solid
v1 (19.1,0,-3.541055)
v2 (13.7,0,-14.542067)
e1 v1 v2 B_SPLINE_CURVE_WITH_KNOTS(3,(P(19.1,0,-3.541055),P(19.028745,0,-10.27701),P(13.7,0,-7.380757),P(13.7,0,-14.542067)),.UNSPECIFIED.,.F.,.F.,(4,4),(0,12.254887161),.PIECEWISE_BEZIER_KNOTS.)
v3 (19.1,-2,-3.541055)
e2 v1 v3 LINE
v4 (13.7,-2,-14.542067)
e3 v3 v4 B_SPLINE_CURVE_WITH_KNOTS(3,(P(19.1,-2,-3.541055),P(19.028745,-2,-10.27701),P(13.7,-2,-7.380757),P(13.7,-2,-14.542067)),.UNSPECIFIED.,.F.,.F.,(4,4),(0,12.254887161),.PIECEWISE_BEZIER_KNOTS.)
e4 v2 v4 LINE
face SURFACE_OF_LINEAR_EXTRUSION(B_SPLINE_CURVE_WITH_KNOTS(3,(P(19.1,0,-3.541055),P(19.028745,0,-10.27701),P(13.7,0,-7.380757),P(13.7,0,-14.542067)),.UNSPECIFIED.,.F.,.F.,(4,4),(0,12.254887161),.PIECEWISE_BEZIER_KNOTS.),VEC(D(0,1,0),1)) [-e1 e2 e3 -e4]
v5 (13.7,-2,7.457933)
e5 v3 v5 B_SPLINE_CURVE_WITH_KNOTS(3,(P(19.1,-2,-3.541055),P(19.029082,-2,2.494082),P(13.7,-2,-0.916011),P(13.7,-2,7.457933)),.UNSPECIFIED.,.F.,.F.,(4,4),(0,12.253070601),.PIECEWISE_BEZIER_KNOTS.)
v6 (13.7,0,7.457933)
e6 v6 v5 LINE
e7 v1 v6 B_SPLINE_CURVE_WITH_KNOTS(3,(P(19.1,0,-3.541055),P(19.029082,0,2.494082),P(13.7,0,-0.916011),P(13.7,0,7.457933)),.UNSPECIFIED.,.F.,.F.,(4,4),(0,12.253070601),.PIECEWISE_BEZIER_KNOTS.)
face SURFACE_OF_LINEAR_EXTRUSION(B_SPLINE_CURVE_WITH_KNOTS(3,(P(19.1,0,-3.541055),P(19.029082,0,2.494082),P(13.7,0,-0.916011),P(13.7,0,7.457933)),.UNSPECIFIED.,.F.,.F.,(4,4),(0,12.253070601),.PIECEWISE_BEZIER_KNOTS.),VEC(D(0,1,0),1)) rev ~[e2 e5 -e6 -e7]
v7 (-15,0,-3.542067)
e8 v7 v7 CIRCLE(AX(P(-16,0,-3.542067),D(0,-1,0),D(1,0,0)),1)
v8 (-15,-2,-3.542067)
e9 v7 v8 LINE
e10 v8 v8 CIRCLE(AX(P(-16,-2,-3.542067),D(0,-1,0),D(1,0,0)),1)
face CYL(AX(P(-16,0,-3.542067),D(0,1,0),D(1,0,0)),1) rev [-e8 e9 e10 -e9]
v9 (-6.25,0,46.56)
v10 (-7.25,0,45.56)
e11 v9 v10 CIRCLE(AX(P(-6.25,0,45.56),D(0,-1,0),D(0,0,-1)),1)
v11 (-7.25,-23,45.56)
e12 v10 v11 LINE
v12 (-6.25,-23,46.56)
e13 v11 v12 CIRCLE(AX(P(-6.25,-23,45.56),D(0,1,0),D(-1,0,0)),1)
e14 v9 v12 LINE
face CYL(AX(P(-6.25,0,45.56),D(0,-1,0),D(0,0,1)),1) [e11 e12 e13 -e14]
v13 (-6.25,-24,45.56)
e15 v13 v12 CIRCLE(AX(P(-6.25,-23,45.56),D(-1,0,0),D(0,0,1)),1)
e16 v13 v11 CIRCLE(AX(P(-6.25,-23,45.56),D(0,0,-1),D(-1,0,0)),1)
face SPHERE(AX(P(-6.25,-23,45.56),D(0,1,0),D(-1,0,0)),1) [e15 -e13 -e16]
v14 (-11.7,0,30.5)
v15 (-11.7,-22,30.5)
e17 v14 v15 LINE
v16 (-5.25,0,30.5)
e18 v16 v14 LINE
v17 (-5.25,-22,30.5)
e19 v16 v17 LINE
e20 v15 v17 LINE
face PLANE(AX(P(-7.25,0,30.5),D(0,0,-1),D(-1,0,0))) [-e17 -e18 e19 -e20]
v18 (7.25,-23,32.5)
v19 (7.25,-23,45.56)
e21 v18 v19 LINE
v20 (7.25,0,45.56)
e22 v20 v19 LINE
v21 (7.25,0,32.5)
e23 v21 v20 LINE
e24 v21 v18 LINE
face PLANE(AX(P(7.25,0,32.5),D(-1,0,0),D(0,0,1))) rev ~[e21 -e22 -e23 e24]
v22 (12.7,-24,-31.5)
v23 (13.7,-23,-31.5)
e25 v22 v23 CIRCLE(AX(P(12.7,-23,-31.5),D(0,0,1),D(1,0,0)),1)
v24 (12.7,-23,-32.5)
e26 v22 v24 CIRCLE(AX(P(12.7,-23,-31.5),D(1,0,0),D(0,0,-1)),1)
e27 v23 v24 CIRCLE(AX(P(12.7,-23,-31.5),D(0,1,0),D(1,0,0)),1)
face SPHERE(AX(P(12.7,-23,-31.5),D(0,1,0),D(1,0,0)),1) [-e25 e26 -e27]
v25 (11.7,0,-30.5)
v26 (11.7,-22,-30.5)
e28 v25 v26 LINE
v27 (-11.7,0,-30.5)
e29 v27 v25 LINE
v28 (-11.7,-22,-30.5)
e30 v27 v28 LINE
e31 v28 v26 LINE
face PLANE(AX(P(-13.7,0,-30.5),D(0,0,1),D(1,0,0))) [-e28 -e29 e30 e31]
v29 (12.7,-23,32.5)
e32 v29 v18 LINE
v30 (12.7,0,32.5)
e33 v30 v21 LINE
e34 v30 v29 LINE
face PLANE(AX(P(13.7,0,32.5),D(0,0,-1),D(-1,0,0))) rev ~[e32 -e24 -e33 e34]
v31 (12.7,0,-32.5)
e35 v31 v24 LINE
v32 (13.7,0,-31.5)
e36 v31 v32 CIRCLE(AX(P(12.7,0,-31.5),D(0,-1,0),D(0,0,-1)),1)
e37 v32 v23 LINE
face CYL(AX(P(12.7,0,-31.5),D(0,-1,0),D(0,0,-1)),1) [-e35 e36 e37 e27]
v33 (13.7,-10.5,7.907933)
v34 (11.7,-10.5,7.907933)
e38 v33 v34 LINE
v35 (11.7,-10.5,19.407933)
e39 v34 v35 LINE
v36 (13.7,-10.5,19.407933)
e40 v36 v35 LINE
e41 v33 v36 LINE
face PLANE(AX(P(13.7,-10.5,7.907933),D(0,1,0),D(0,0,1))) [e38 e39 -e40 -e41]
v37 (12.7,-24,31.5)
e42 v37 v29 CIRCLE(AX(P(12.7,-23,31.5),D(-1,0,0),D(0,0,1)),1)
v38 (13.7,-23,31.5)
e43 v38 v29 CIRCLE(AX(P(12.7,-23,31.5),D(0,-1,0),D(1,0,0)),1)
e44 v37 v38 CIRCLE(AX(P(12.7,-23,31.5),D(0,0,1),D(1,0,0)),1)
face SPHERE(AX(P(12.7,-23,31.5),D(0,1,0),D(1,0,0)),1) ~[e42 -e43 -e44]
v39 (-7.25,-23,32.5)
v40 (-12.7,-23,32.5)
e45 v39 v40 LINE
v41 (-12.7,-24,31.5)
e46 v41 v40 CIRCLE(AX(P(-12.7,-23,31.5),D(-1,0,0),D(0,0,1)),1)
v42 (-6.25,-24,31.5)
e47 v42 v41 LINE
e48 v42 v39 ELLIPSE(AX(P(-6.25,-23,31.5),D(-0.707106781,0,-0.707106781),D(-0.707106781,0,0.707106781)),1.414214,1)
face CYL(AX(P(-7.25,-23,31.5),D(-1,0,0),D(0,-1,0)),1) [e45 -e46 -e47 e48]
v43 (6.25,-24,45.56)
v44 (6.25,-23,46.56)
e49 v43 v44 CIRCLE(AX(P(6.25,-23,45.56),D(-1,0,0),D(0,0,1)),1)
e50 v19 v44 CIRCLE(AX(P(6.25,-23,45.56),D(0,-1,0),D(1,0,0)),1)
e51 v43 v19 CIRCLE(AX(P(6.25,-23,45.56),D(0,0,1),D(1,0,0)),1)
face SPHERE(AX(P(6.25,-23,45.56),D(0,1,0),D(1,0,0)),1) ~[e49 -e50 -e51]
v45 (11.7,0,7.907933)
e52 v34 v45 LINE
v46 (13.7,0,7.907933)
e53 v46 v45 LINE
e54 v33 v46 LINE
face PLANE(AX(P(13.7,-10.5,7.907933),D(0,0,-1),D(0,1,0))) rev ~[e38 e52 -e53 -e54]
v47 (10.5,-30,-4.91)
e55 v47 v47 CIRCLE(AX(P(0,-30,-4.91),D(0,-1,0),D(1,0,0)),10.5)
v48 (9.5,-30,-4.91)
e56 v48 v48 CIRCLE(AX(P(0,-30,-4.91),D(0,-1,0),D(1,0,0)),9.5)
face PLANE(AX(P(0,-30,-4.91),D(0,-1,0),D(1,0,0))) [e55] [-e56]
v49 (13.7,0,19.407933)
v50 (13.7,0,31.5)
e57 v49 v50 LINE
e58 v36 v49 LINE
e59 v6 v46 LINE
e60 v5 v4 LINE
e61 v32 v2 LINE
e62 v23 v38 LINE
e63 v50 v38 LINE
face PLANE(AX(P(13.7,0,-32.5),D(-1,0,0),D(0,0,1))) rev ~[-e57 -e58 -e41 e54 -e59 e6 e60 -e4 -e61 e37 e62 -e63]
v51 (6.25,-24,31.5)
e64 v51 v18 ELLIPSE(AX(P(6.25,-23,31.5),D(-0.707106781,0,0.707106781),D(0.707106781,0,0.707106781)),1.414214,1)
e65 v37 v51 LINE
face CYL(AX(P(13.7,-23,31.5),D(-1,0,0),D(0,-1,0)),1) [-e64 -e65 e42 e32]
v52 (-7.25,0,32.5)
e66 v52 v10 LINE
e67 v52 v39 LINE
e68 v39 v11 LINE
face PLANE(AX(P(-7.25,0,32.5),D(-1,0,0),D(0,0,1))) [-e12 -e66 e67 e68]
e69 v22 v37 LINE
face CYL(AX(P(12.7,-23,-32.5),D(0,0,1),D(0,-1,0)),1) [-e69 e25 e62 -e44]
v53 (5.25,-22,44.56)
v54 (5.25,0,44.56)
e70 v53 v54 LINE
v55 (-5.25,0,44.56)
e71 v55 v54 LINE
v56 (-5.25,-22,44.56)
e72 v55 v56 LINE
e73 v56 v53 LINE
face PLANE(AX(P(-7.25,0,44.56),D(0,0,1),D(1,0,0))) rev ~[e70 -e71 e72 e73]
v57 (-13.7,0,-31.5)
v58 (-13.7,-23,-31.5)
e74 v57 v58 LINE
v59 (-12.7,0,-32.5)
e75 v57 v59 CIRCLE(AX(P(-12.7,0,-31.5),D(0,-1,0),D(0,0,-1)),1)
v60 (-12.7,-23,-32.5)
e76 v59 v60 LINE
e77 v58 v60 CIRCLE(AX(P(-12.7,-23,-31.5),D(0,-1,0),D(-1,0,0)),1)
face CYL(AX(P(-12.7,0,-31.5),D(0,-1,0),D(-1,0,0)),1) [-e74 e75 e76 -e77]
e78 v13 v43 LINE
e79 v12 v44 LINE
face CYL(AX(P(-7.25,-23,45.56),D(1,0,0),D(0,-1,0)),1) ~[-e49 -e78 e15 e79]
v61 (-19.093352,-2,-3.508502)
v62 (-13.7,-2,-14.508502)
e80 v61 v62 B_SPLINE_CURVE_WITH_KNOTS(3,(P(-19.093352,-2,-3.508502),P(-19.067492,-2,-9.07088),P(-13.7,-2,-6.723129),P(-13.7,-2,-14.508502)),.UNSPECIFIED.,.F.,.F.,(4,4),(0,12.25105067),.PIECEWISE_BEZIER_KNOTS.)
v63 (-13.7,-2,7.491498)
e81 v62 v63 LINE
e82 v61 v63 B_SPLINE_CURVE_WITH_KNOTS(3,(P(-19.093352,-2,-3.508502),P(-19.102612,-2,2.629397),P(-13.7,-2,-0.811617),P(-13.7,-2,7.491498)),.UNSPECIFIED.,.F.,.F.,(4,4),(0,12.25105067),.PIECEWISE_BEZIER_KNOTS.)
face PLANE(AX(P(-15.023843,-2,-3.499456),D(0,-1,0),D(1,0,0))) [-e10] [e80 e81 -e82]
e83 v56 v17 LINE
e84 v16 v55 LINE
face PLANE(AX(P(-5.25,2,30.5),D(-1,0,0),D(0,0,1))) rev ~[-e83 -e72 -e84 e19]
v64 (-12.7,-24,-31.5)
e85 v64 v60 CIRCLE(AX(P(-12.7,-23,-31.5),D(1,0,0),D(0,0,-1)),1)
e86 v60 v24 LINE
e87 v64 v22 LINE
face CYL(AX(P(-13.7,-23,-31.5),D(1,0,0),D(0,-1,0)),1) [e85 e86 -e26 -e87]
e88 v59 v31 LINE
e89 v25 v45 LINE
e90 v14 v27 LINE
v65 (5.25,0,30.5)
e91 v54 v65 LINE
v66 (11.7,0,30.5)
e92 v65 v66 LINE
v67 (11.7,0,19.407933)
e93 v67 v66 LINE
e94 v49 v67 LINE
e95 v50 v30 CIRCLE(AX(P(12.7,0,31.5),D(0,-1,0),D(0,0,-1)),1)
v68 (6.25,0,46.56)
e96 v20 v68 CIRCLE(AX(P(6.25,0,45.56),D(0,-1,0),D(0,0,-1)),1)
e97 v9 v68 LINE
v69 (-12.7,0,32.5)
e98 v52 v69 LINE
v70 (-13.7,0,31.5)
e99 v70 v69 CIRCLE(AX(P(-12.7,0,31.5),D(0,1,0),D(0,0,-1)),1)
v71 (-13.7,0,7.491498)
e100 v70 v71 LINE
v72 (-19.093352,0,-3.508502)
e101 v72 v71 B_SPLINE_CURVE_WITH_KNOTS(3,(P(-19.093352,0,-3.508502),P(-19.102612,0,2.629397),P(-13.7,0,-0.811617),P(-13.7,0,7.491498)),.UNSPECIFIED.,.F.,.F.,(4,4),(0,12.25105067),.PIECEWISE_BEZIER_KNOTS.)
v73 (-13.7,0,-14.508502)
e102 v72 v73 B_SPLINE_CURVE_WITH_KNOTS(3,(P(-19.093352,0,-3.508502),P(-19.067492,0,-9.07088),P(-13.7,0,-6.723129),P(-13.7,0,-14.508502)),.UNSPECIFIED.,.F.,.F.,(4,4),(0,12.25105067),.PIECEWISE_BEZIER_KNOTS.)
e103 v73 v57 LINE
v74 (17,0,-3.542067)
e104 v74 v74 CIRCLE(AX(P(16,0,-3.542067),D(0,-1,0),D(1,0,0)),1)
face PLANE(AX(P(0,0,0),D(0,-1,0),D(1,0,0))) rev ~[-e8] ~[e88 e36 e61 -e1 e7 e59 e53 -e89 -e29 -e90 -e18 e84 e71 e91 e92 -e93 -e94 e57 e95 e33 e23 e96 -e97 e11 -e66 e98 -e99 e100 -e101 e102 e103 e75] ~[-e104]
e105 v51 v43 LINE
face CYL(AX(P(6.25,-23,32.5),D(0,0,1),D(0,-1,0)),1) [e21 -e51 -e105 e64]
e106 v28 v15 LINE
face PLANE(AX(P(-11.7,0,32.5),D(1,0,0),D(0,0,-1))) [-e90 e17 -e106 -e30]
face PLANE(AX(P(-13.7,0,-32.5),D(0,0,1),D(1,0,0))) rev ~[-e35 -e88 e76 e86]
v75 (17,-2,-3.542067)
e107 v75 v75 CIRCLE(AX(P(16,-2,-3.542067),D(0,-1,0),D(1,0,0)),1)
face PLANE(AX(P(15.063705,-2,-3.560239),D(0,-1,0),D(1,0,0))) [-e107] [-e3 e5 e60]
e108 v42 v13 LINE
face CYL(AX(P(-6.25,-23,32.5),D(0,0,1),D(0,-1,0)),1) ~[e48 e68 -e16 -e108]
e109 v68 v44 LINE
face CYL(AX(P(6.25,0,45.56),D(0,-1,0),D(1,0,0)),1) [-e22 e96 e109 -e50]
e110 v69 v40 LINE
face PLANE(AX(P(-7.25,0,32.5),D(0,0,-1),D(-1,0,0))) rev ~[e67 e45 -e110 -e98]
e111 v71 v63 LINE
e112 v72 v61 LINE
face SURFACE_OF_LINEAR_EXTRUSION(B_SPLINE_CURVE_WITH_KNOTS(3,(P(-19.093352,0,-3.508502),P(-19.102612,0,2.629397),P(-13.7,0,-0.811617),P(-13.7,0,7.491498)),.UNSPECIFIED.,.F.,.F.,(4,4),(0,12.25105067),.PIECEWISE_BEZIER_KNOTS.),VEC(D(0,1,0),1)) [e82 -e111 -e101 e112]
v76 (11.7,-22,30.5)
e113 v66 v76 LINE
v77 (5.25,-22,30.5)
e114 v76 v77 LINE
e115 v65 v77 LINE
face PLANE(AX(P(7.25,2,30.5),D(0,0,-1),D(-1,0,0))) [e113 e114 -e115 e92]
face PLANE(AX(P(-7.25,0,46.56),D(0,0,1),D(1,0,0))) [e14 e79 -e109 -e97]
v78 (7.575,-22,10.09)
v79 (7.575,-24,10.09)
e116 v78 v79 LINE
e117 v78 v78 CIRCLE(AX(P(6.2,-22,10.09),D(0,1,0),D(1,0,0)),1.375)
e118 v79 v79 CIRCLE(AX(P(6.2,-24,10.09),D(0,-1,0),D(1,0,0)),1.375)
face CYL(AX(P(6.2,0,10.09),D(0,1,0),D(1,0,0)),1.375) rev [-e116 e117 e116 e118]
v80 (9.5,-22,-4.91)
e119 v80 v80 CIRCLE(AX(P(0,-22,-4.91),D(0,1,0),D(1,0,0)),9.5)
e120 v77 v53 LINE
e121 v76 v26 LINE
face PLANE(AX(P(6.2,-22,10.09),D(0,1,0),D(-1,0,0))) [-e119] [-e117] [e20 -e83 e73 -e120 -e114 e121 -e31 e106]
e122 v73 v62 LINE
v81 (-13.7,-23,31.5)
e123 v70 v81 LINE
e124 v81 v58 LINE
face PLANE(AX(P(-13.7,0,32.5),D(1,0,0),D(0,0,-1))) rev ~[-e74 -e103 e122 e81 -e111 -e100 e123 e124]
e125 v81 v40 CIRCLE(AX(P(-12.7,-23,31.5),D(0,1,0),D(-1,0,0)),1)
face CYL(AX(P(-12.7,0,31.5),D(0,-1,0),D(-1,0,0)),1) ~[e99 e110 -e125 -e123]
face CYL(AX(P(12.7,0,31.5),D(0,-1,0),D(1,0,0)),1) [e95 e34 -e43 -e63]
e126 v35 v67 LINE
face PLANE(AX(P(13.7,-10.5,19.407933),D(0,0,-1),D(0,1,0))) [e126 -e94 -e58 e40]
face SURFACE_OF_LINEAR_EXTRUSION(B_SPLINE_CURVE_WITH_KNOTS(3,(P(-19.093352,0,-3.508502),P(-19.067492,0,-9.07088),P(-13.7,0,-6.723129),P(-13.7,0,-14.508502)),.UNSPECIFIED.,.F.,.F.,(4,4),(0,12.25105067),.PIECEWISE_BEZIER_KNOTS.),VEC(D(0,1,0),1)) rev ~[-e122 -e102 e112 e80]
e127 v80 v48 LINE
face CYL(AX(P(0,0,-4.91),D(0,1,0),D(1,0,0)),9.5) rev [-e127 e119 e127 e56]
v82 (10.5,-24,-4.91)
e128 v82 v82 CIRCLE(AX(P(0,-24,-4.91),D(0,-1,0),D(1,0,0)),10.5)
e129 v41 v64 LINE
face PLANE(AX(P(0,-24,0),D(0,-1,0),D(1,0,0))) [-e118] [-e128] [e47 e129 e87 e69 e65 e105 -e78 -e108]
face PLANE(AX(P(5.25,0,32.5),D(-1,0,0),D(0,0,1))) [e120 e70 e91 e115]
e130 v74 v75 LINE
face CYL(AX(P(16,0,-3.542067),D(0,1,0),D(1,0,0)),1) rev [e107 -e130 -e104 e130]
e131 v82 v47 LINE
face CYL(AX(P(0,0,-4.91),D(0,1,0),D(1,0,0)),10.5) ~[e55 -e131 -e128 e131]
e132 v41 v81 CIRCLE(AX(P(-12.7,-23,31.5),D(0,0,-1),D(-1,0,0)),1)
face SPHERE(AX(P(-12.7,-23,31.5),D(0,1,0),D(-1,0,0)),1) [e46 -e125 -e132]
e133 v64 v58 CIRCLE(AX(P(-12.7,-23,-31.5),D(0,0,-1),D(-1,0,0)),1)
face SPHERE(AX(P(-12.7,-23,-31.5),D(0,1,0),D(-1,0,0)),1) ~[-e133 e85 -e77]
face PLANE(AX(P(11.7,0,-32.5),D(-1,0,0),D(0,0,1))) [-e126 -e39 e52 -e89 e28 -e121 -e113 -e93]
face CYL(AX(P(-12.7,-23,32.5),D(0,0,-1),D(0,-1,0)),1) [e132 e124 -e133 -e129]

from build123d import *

# Parameters (mm, degrees)
F0_R        = 10.5
F0_R_2      = 1.375
F0_W        = 14.5
F0_H        = 14.06
F1_DEPTH    = 24
F2_T        = 2
F2_T3_DEPTH = 28
F0_R_3      = 9.5
F3_DEPTH    = 30
F0_R_4      = 1
F4_DEPTH    = 2
F5_R        = 1
F6_R        = 3.375
F7_DEPTH    = 22
F9_DEPTH    = 22
F10_W       = 10.5
F10_H       = 11.5
F11_DEPTH   = 2


# Not quite as in the source:
# - an extrude ends at something that could not be found from the text; its depth is read off the source's solid
# - a shell that OpenCascade refuses in one call is made with other operations: the cavity is built on its own and cut out


with BuildPart() as f1:
    # F0 (on Front) → F1 (new body)
    with BuildSketch(Plane.XZ):
        Polygon((-7.25, 32.5), (-13.7, 32.5), (-13.7, 7.4914984291), (-13.7, -14.5085015709), (-13.7, -32.5), (13.7, -32.5), (13.7, -14.5420665913), (13.7, 7.4579334087), (13.7, 32.5), (7.25, 32.5), align=None)
        with Locations((0, -4.91)):
            Circle(F0_R, mode=Mode.SUBTRACT)
        with Locations((6.2, 10.09)):
            Circle(F0_R_2, mode=Mode.SUBTRACT)
        with Locations((0, 39.53)):
            Rectangle(F0_W, F0_H)
    extrude(amount=F1_DEPTH)

    # F2: shell of thickness 2, made by hand


with BuildPart() as f2_core1:
    # F2_t2: copy of F1
    add(f1.part)

    # the walls: a layer under each face that stays
    f2_faces = [f2_core1.faces().sort_by_distance(p)[0] for p in [
        (-10.475, -12, 32.5),
        (-13.7, -12, 0),
        (0, -12, -32.5),
        (13.7, -12, 0),
        (10.475, -12, 32.5),
        (7.25, -12, 39.53),
        (0, -12, 46.56),
        (-7.25, -12, 39.53),
        (-10.5, -12, -4.91),
        (4.825, -12, 10.09),
        (0, -24, 7.03),
    ]]
    thicken(f2_faces, amount=-F2_T, mode=Mode.SUBTRACT)

    # F2_s4 → F2_t3 (cut)
    with BuildSketch(Plane.XZ.offset(-2)):
        Polygon((-7.27, 32.52), (-7.25, 30.5), (-5.25, 30.5), (-5.25, 32.5), align=None)
        Polygon((7.27, 32.52), (7.25, 30.5), (5.25, 30.5), (5.25, 32.5), align=None)
    extrude(amount=F2_T3_DEPTH, mode=Mode.SUBTRACT)


with BuildPart() as f1_1:
    add(f1.part)

    # what is left inside the walls is the cavity
    f2_cavity = [f2_core1.part.solids().sort_by_distance(p)[0] for p in [
        (0, -0.02, 14.513333),
        (0, -14.666667, -17.43),
    ]]
    add(f2_cavity, mode=Mode.SUBTRACT)

    # F0 (on Front) → F3 (join)
    with BuildSketch(Plane.XZ):
        with Locations((0, -4.91)):
            Circle(F0_R)
        with Locations((0, -4.91)):
            Circle(F0_R_3, mode=Mode.SUBTRACT)
    extrude(amount=F3_DEPTH)

    # F0 (on Front) → F4 (join)
    with BuildSketch(Plane.XZ):
        with BuildLine():
            Line((-13.7, -14.5085015709), (-13.7, 7.4914984291))
            add(Edge.make_bspline(
                [(-19.093351697, -3.5085015709), (-19.1026122295, 2.6293974578), (-13.7, -0.8116166133), (-13.7, 7.4914984291)],
                knots=[0, 0, 0, 0, 12.2510506704, 12.2510506704, 12.2510506704, 12.2510506704], degree=3))
            add(Edge.make_bspline(
                [(-19.093351697, -3.5085015709), (-19.0674920552, -9.0708802246), (-13.7, -6.7231292221), (-13.7, -14.5085015709)],
                knots=[0, 0, 0, 0, 12.2510506704, 12.2510506704, 12.2510506704, 12.2510506704], degree=3))
        make_face()
        with Locations((-16, -3.5420665913)):
            Circle(F0_R_4, mode=Mode.SUBTRACT)
        with BuildLine():
            add(Edge.make_bspline(
                [(19.0999998349, -3.5410547692), (19.0290823921, 2.4940823569), (13.7, -0.9160112299), (13.7, 7.4579334087)],
                knots=[0, 0, 0, 0, 12.2530706011, 12.2530706011, 12.2530706011, 12.2530706011], degree=3))
            Line((13.7, 7.4579334087), (13.7, -14.5420665913))
            add(Edge.make_bspline(
                [(19.0999998349, -3.5410547692), (19.0287452534, -10.2770104641), (13.7, -7.3807572052), (13.7, -14.5420665913)],
                knots=[0, 0, 0, 0, 12.2548871608, 12.2548871608, 12.2548871608, 12.2548871608], degree=3))
        make_face()
        with Locations((16, -3.5420665913)):
            Circle(F0_R_4, mode=Mode.SUBTRACT)
    extrude(amount=F4_DEPTH)

    # F5
    f5_edges = [f1_1.edges().sort_by_distance(p)[0] for p in [
        (13.7, -12, 32.5),
        (-13.7, -12, 32.5),
        (-13.7, -12, -32.5),
        (13.7, -12, -32.5),
        (7.25, -12, 46.56),
        (-7.25, -12, 46.56),
        (7.25, -24, 39.53),
        (-7.25, -24, 39.53),
        (-13.7, -24, 0),
        (13.7, -24, 0),
        (0, -24, -32.5),
        (-10.475, -24, 32.5),
        (10.475, -24, 32.5),
        (0, -24, 46.56),
    ]]
    fillet(f5_edges, radius=F5_R)

    # F6 (on face) → F7 (cut, through all)
    with BuildSketch(Plane(origin=(0, 0, 0), x_dir=(-1, 0, 0), z_dir=(0, 1, 0))):
        with Locations((-6.2, 10.09)):
            Circle(F6_R)
    extrude(amount=-F7_DEPTH, mode=Mode.SUBTRACT)

    # F8 (on face) → F9 (cut, through all)
    with BuildSketch(Plane(origin=(0, 0, 0), x_dir=(-1, 0, 0), z_dir=(0, 1, 0))):
        with BuildLine():
            ThreePointArc((-11.7, -9.31), (0, -17.41), (11.7, -9.31))
            Line((11.7, -9.31), (11.7, -0.51))
            ThreePointArc((11.7, -0.51), (0, 7.59), (-11.7, -0.51))
            Line((-11.7, -0.51), (-11.7, -9.31))
        make_face()
    extrude(amount=-F9_DEPTH, mode=Mode.SUBTRACT)

    # F10 (on face) → F11 (cut, through all)
    with BuildSketch(Plane.YZ.offset(13.7)):
        with Locations((-5.25, 13.6579334087)):
            Rectangle(F10_W, F10_H)
    extrude(amount=-F11_DEPTH, mode=Mode.SUBTRACT)


solid = f1_1.part
